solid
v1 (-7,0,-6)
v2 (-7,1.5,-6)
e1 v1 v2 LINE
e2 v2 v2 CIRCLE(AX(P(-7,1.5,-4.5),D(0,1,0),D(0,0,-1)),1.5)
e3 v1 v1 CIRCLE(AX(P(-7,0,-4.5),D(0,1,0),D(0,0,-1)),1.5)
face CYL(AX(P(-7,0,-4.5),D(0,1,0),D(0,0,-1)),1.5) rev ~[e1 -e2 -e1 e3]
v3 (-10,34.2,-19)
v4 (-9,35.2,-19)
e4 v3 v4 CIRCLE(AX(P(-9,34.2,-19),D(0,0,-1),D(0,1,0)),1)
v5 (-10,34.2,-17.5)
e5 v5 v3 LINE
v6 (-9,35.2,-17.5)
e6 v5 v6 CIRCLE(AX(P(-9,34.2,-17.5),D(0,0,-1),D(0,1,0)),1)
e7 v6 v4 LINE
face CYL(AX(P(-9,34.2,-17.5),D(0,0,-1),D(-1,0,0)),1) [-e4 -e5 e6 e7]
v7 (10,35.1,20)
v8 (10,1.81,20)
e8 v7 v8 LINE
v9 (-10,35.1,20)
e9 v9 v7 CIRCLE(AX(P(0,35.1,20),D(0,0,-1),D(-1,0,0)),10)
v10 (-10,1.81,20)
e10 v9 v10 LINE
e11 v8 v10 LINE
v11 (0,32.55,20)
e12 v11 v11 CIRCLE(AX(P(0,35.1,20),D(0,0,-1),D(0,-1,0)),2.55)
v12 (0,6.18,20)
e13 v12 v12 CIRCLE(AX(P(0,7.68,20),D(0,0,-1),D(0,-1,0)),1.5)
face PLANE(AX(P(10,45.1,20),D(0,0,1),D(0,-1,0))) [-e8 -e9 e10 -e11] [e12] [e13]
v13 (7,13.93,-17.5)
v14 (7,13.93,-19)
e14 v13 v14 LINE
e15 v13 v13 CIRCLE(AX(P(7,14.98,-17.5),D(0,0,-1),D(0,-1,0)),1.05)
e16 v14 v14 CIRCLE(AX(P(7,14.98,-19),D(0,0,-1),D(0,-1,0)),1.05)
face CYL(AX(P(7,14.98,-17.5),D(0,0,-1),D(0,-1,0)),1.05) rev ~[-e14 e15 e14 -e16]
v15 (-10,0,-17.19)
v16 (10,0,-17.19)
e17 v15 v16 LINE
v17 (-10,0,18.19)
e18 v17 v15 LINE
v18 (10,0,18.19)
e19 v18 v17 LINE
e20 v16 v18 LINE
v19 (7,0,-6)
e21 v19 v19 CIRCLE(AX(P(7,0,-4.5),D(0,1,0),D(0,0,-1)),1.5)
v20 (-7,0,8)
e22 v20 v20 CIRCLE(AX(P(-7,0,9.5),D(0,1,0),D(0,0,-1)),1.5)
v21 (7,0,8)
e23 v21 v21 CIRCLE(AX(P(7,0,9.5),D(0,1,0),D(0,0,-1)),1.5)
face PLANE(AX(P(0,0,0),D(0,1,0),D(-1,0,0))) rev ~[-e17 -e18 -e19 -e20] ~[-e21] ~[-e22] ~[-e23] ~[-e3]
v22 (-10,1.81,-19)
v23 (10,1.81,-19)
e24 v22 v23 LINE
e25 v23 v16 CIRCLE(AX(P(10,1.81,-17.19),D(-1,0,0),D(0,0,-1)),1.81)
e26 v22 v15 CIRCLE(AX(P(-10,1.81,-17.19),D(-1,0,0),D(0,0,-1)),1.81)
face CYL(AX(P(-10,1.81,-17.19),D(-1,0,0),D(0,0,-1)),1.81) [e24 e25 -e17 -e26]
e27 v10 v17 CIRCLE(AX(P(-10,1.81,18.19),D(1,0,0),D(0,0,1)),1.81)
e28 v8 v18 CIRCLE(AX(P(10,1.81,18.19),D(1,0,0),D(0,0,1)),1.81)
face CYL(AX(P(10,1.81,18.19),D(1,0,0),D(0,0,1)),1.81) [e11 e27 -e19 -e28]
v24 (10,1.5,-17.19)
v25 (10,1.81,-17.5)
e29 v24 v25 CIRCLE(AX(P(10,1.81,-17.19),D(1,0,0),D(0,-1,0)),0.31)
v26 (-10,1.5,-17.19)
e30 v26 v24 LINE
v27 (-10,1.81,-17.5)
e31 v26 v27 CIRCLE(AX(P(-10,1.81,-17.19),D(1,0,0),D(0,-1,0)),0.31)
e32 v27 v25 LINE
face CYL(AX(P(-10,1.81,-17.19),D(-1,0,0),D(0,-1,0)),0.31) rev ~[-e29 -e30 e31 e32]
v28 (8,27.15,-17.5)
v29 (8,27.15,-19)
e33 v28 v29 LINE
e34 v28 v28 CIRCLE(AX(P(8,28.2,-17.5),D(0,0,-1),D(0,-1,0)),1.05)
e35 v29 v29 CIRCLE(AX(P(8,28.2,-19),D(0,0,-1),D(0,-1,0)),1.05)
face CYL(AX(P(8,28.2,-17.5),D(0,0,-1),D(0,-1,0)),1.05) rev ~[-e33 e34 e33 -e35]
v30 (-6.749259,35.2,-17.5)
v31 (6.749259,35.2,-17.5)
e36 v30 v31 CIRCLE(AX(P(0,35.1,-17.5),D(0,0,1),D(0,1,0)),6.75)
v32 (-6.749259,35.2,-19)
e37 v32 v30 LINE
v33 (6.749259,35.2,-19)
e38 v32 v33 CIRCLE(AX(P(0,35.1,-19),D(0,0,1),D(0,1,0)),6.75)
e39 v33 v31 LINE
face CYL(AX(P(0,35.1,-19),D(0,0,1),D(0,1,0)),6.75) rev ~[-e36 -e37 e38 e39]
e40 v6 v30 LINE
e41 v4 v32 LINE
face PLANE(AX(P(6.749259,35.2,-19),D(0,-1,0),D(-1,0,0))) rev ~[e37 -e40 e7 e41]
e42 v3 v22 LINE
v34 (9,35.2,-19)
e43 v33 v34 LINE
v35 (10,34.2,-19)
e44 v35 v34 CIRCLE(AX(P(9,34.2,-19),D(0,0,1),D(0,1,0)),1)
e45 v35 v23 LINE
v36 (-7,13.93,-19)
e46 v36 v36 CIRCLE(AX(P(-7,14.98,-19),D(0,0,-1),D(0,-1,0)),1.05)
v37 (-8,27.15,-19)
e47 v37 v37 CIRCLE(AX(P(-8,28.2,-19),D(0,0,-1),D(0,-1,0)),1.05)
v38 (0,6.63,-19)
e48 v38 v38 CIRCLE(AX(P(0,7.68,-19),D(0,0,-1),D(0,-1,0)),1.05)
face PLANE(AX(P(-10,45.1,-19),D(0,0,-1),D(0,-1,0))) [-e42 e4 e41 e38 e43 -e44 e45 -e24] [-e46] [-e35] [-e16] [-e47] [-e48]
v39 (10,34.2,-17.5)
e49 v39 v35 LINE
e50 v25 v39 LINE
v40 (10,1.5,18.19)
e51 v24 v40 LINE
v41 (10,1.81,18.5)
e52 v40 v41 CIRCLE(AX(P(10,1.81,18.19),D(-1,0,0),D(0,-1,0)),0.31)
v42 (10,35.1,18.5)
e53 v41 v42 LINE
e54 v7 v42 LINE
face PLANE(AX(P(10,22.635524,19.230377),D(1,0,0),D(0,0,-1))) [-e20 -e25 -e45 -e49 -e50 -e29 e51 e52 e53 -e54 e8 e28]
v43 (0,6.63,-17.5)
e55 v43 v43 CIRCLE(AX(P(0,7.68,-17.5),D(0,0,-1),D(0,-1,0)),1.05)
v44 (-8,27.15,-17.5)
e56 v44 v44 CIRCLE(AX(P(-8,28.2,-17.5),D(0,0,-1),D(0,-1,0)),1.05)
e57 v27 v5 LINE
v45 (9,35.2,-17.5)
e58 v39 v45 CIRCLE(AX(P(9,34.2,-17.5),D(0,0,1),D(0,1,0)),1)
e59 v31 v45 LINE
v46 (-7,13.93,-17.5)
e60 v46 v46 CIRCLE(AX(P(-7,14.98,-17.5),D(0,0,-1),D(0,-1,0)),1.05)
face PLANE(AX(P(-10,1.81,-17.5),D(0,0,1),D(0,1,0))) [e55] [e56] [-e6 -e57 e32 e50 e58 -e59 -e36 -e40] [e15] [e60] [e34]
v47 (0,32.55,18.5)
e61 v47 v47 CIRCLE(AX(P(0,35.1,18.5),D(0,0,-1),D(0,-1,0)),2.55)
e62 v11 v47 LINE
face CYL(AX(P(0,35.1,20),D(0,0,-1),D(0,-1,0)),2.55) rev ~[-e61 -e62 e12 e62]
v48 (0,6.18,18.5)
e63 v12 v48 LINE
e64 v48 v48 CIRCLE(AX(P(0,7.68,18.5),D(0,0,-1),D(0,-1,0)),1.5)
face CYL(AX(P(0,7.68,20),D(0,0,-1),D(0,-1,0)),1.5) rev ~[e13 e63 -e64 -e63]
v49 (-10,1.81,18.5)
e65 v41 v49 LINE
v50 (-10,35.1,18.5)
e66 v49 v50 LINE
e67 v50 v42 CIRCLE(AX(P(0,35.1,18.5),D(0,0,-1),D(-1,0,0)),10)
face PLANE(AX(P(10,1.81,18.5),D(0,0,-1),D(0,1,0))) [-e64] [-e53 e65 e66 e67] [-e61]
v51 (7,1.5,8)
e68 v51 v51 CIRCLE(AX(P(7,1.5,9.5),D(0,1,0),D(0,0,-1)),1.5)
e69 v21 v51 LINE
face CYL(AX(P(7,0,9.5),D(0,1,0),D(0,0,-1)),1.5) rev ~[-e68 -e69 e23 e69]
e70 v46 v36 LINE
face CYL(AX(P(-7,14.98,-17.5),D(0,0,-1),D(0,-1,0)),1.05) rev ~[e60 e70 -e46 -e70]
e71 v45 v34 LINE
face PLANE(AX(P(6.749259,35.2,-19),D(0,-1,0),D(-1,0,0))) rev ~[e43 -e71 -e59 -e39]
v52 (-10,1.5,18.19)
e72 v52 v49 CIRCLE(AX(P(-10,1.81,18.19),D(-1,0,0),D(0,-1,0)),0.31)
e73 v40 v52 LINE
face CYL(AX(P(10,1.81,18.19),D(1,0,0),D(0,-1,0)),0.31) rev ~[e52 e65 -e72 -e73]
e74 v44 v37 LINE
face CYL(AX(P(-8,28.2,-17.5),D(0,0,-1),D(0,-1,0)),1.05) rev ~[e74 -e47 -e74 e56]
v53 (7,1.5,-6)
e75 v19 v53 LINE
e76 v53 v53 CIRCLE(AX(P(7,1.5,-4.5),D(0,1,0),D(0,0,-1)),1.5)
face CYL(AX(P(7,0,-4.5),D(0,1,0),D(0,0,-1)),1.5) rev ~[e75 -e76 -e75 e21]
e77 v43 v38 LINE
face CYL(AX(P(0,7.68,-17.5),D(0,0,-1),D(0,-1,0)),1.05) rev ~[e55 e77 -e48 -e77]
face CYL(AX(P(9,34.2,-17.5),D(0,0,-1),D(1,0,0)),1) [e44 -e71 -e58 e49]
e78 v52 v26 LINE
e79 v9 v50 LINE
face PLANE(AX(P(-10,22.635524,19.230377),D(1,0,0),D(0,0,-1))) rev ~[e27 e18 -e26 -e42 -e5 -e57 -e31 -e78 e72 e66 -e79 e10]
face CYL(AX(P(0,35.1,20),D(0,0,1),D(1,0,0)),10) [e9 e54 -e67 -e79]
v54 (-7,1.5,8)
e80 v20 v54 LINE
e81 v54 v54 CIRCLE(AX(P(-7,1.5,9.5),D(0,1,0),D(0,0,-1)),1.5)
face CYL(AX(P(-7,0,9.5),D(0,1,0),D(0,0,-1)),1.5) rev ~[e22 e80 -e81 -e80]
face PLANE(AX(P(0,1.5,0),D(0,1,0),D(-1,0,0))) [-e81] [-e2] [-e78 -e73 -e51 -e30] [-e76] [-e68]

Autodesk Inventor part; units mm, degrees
ref_plane "YZ Plane" through (0, 0, 0) normal (1, 0, 0) x (0, 1, 0)
ref_plane "XZ Plane" through (0, 0, 0) normal (0, 1, 0) x (-1, 0, 0)
ref_plane "XY Plane" through (0, 0, 0) normal (0, 0, 1) x (1, 0, 0)
sketch "Sketch1" plane through (0, 0, 0) normal (0, 1, 0) x (-1, 0, 0)
  line L0 (10, -17.5) -> (-10, -17.5)
  line L1 (-10, -17.5) -> (-10, 18.5)
  line L2 (-10, 18.5) -> (10, 18.5)
  line L3 (10, 18.5) -> (10, -17.5)
  point P0 (0, 0)
  dimension "d0" = 20
  dimension "d1" = 36
  dimension "d2" = 17.5
  dimension "d3" = 10
extrude "Plate1" add sketch "Sketch1" along normal blind 1.5
sketch "Sketch2" plane through (-10, 0, -19) normal (0, 0, 1) x (1, 0, 0)
  line L0 (20, 0) -> (0, 0)
  line L1 (0, 0) -> (0, 45.1)
  line L2 (0, 45.1) -> (20, 45.1)
  line L3 (20, 45.1) -> (20, 0)
edge flange "Flange1" height 45.1 angle 90 thickness 1.5 bend radius 0.31 thickness toward (0, 0, 1) relief tear relief width 1.5 relief depth 0.75 edges at (0, 1.5, -17.5) wall of the first edge with corners at (10, 0, -19) (-10, 0, -19) (-10, 45.1, -19) (10, 45.1, -19)
bend "Bend1"
corner "Corner1"
sketch "Sketch3" plane through (10, 0, 20) normal (0, 0, -1) x (-1, 0, 0)
  line L0 (20, 0) -> (0, 0)
  line L1 (0, 0) -> (0, 45.1)
  line L2 (0, 45.1) -> (20, 45.1)
  line L3 (20, 45.1) -> (20, 0)
edge flange "Flange2" height 45.1 angle 90 thickness 1.5 bend radius 0.31 thickness toward (0, 0, -1) relief tear relief width 1.5 relief depth 0.75 edges at (0, 1.5, 18.5) wall of the first edge with corners at (-10, 0, 20) (10, 0, 20) (10, 45.1, 20) (-10, 45.1, 20)
bend "Bend2"
corner "Corner2"
sketch "Sketch4" plane through (-10, 45.1, 20) normal (0, 0, 1) x (1, 0, 0)
  circle A0 centre (10, -10) radius 10
  line L0 (0, 0) -> (20, 0) projected
  line L1 (0, 0) -> (20, 0)
  line L2 (20, 0) -> (20, -10)
  line L3 (20, -10) -> (0, -10)
  line L4 (0, -10) -> (0, 0)
  line L5 (0, -43.29) -> (0, 0) projected
  point P0 (10, -45.1)
  point P1 (10, -10)
  point P2 (20, 0)
  point P3 (10, 0)
  point P4 (0, -10)
  point P5 (8.5893, 0)
  point P6 (0, -10)
  dimension "d26" = 20
  dimension "d25" = 10
  dimension "d27" = 10
  dimension "d28" = 10
extrude "Extrusion1" cut sketch "Sketch4" against normal blind 10 contours L4 L0 A0 | A0 L0 L2
sketch "Sketch5" plane through (10, 45.1, -19) normal (0, 0, -1) x (-1, 0, 0)
  arc A0 (20, -10) -> (0, -10) centre (10, -10) ccw projected
  point P0 (10, -45.1)
hole "Hole1" at (0, 35.1, -19) direction (0, 0, 1) diameter 13.5 depth 1.5
sketch "Sketch6" plane through (10, 45.1, -19) normal (0, 0, -1) x (-1, 0, 0)
  circle A0 centre (10, -10) radius 6.75 projected
  line L0 (0, 0) -> (20, 0) projected
  line L1 (0, -43.29) -> (0, 0) projected
  line L2 (24, 0) -> (-4, 0)
  line L3 (-4, 0) -> (-4, -9.9)
  line L4 (-4, -9.9) -> (24, -9.9)
  line L5 (24, -9.9) -> (24, 0)
  point P0 (10, -45.1)
  point P1 (20, 0)
  point P2 (6.005, 0)
  point P3 (13.995, 0)
  dimension "d38" = 9.9
  dimension "d39" = 4
  dimension "d40" = 28
extrude "Extrusion2" cut sketch "Sketch6" against normal blind 10 contours L4 A0 | A0 L4 L1 L0 L2 L5 | L4 L3 L2 L1 picked at (7.8223, -9.3675)
fillet "Fillet1" radius 1 2 edges at (-10, 35.2, -18.25) (10, 35.2, -18.25)
sketch "Sketch7" plane through (-10, 1.81, 20) normal (0, 0, 1) x (1, 0, 0)
  arc A0 (20, 33.29) -> (0, 33.29) centre (10, 33.29) ccw projected
  point P0 (10, -1.81)
hole "Hole2" at (0, 35.1, 20) direction (0, 0, -1) diameter 5.1 depth 1.5 clearance for "Hex Head Bolt" size "M5" standard "Ansi Metric M Profile"
sketch "Sketch8" plane through (0, 0, 0) normal (0, -1, 0) x (1, 0, 0)
  line L0 (2.55, 18.5) -> (-2.55, 18.5) projected
  line L1 (-10, 18.5) -> (10, 18.5) projected
  line L2 (10, 18.5) -> (-10, 18.5) projected
  line L3 (10, 18.19) -> (-10, 18.19) projected
  line L4 (-10, -17.19) -> (-10, 18.19) projected
  line L5 (-10, -17.19) -> (10, -17.19) projected
  line L6 (10, 18.19) -> (10, -17.19) projected
  point P0 (0, 0)
  point P1 (7, 9.5)
  point P2 (7, -4.5)
  point P3 (-7, 9.5)
  point P4 (-7, -4.5)
  dimension "d51" = 9
  dimension "d52" = 3
  dimension "d55" = 14
  dimension "d58" = 14
hole "Hole3" at (7, 0, 9.5) at (7, 0, -4.5) at (-7, 0, 9.5) at (-7, 0, -4.5) direction (0, 1, 0) diameter 3 depth 1.5
sketch "Sketch11" plane through (-10, 1.81, -17.5) normal (0, 0, 1) x (1, 0, 0)
  circle A0 centre (18, 26.39) radius 0.7835
  circle A1 centre (2, 26.39) radius 0.7835
  circle A2 centre (17, 13.17) radius 0.7835
  circle A3 centre (3, 13.17) radius 0.7835
  circle A4 centre (10, 5.87) radius 0.7835
  point P0 (10, -1.81)
hole "Hole6" at (-8, 28.2, -17.5) at (-7, 14.98, -17.5) at (0, 7.68, -17.5) at (7, 14.98, -17.5) at (8, 28.2, -17.5) direction (0, 0, -1) diameter 2.1 depth 1.5
sketch "Sketch12" plane through (-10, 1.81, 20) normal (0, 0, 1) x (1, 0, 0)
  line L0 (20, -1.81) -> (0, -1.81) projected
  circle A0 centre (10, 5.87) radius 1.05 projected
  point P0 (10, -1.81)
hole "Hole7" at (0, 7.68, 20) direction (0, 0, -1) diameter 3 depth 1.5
equation "\"d36\" = Thickness"
equation "\"d49\" = Thickness"
equation "\"d66\" = Thickness"
equation "\"d87\" = Thickness"
equation "\"d94\" = Thickness"
equation "\"d4\" = Thickness"
equation "\"d5\" = BendReliefWidth"
equation "\"d6\" = BendReliefDepth"
equation "\"d7\" = MinimumRemnant"
equation "\"d8\" = TransitionRadius"
equation "\"d11\" = BendRadius"
equation "\"d12\" = CornerReliefSize"
equation "\"d13\" = GapSize"
equation "\"d14\" = JacobiRadiusSize"
equation "\"d15\" = BendReliefWidth"
equation "\"d16\" = BendReliefDepth"
equation "\"d17\" = MinimumRemnant"
equation "\"d18\" = TransitionRadius"
equation "\"d21\" = BendRadius"
equation "\"d22\" = CornerReliefSize"
equation "\"d23\" = GapSize"
equation "\"d24\" = JacobiRadiusSize"
equation "\"BendReliefWidth\" = Thickness"
equation "\"BendReliefDepth\" = 0.5 * Thickness"
equation "\"CornerReliefSize\" = 4 * Thickness"
equation "\"MinimumRemnant\" = 2 * Thickness"
equation "\"TransitionRadius\" = BendRadius"
equation "\"JacobiRadiusSize\" = BendRadius"
equation "\"GapSize\" = Thickness"
equation "\"Thickness\" = 1.5"
equation "\"BendRadius\" = 0.31"
properties part number "axis_9_bottom_frame" material "Aluminum 6061-AHC"
